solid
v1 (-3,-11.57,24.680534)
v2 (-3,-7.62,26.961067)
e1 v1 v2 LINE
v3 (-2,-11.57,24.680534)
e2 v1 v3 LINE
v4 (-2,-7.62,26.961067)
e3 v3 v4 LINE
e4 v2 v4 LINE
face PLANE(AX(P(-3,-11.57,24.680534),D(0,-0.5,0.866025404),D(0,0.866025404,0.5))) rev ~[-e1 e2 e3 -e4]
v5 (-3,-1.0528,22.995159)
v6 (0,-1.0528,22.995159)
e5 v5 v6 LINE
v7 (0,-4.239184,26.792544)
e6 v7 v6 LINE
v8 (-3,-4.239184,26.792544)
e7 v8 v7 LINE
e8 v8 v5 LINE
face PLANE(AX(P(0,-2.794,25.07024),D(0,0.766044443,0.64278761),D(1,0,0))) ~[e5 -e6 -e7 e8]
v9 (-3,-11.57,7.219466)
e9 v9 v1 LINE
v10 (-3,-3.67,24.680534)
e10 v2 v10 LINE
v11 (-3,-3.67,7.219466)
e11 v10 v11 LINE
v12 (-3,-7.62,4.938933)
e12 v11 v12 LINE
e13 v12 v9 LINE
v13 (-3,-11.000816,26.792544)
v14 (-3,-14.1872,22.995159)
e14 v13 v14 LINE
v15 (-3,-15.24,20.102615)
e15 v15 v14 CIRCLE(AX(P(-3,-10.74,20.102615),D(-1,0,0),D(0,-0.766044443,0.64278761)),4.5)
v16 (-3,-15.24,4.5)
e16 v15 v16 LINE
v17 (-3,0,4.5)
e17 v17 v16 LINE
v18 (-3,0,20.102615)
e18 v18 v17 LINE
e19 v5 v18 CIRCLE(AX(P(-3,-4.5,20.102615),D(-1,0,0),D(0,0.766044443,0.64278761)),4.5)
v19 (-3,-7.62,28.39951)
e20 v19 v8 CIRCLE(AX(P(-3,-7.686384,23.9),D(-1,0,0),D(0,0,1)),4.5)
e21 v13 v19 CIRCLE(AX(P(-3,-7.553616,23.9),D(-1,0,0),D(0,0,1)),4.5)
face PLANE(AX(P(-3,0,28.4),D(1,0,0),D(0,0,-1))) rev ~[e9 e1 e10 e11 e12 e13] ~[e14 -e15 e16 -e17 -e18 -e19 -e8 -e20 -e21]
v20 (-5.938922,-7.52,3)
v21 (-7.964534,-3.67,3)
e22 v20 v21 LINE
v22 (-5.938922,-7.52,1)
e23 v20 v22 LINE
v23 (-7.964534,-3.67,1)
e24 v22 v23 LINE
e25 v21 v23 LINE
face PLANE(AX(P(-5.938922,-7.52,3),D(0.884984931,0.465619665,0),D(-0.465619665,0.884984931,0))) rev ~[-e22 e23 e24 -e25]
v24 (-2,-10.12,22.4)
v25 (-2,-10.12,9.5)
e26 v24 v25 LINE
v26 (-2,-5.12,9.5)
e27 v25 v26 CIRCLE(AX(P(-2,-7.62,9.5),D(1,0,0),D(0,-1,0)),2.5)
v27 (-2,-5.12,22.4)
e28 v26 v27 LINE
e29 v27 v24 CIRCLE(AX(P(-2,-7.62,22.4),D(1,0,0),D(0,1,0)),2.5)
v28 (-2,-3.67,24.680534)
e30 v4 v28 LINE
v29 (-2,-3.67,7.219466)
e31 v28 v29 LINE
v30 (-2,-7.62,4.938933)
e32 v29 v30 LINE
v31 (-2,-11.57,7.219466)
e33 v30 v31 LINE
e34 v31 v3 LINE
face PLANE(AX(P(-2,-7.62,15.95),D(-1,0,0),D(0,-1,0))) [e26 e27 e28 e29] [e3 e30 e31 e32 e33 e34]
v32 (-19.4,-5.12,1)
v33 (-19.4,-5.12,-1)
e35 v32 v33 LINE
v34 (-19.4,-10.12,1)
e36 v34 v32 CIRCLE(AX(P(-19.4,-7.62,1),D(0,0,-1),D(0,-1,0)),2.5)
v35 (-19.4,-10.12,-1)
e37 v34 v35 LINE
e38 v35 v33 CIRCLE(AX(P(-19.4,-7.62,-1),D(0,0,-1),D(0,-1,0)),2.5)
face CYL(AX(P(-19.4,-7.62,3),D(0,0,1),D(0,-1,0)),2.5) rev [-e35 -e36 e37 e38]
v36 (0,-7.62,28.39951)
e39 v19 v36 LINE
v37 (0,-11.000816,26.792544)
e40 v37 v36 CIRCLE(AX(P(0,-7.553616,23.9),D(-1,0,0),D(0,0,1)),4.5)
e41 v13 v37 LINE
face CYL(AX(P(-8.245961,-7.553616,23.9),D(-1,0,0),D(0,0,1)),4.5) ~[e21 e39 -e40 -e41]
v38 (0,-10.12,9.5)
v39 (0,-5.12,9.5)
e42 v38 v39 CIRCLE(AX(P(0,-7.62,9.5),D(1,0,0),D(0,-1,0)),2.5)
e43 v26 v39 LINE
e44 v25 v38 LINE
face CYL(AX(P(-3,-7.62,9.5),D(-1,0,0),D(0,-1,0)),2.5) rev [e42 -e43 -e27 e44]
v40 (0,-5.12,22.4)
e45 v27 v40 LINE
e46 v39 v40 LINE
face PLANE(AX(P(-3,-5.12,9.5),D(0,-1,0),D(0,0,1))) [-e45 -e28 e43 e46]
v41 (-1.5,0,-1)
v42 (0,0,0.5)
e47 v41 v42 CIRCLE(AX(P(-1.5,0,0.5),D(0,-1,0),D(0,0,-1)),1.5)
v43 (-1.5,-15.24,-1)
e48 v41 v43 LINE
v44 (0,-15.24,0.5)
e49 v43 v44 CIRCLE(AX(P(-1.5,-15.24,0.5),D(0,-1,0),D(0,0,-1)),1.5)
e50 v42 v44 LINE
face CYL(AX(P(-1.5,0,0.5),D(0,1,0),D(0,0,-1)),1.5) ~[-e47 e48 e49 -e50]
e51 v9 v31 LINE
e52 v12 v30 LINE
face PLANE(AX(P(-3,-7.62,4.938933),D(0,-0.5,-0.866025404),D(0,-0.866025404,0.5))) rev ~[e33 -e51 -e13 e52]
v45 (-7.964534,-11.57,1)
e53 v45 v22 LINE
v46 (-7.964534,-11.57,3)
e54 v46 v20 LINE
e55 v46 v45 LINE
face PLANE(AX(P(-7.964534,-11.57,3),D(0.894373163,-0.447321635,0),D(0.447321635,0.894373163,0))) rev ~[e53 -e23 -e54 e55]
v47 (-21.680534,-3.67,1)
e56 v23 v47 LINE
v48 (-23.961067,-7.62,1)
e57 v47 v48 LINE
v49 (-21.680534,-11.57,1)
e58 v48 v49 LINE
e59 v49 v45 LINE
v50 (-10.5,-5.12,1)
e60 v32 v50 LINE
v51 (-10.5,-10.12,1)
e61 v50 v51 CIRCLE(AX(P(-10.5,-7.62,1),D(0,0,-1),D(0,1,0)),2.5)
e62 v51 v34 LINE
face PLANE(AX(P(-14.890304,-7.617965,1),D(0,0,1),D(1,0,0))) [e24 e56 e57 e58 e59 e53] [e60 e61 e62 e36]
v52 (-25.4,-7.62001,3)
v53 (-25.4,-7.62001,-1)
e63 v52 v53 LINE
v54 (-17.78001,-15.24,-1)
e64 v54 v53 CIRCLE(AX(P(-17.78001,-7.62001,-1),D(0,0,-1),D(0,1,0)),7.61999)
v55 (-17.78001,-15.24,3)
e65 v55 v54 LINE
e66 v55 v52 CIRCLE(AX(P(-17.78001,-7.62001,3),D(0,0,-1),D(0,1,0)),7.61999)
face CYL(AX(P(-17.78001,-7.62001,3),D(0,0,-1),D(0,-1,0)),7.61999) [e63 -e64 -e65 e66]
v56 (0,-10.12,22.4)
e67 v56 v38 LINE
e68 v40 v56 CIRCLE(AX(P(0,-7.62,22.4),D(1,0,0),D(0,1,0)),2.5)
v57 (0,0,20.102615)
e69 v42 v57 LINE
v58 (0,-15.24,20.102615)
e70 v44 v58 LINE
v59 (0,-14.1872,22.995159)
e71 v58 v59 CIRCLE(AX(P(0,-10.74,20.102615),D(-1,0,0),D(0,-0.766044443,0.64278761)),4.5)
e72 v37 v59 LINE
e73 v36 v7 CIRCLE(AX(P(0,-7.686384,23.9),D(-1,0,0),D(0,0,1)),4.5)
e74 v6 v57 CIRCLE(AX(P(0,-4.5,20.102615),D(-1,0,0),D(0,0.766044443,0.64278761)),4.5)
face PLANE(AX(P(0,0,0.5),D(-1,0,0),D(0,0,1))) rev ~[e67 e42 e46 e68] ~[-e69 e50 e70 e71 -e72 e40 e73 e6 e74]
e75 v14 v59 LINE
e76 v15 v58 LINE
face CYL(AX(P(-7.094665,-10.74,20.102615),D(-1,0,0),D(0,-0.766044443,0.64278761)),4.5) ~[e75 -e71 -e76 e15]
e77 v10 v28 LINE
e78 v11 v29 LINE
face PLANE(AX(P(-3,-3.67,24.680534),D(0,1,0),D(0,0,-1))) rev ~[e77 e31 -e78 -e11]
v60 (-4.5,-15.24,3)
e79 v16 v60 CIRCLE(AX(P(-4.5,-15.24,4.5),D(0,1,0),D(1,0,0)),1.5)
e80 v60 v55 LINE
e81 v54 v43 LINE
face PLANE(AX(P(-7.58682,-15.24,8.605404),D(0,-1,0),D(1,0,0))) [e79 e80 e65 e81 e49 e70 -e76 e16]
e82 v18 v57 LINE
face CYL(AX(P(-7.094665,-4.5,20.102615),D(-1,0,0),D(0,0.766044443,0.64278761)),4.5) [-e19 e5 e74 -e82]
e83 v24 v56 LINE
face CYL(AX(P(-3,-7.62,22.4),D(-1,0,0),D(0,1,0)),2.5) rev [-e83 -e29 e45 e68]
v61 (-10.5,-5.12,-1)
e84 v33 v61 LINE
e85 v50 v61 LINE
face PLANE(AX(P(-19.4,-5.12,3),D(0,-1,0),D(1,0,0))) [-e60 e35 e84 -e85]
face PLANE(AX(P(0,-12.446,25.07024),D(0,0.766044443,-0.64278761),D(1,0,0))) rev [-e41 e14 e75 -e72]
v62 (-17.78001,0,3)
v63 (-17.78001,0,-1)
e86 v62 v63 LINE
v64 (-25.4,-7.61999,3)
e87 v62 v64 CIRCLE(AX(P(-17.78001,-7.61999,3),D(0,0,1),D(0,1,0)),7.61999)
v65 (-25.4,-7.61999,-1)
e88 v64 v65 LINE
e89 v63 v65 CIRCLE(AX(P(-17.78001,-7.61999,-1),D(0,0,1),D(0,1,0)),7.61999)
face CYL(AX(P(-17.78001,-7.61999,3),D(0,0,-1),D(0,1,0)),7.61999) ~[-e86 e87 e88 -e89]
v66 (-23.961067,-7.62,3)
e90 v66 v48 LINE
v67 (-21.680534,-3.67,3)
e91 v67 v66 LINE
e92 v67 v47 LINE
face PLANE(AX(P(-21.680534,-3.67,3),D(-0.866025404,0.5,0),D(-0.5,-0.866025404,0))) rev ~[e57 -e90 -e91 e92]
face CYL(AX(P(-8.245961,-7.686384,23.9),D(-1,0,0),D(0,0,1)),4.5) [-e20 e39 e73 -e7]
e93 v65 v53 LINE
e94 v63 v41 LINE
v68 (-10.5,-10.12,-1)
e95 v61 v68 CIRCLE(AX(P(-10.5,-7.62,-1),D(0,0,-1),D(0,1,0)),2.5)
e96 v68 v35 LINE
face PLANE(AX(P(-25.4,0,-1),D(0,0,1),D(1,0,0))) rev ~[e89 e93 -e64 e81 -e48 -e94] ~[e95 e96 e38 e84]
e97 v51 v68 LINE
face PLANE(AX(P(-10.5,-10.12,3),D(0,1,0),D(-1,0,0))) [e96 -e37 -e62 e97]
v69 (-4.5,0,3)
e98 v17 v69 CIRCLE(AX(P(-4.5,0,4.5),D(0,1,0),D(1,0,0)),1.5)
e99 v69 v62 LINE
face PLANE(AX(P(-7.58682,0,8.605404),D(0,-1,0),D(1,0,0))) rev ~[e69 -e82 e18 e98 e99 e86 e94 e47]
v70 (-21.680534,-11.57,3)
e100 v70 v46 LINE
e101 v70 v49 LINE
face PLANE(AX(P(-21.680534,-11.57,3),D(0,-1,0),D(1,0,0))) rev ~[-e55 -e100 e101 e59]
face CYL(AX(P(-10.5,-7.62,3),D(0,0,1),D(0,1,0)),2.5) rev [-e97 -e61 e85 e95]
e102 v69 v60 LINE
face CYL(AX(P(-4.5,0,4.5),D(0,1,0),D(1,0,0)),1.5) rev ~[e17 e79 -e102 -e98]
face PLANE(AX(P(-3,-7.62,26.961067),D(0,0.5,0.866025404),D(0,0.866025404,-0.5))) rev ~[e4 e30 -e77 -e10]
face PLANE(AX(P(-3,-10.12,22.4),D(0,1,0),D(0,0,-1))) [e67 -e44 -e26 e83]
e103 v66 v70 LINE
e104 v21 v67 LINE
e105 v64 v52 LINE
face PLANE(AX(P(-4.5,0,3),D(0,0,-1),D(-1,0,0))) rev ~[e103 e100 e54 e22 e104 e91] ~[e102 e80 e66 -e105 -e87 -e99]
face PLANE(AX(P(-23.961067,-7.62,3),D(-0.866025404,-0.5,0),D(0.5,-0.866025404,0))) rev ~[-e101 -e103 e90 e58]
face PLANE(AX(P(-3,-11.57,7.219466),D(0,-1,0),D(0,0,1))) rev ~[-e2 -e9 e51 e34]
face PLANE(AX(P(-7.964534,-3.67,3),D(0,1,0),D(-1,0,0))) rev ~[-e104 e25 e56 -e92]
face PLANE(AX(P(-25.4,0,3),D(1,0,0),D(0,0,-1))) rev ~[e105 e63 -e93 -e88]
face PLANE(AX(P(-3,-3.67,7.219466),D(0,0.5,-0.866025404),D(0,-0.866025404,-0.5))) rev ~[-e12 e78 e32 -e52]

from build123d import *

# Parameters (mm, degrees)
F1_DEPTH    = 15.24
F3_DEPTH    = 1
F4_DEPTH    = 3
F6_DEPTH    = 2
F7_DEPTH    = 4
F8_SIZE2    = 6.6595190754
F8_SIZE     = 5.588
F9_T1_DEPTH = 11.189330271
F9_T3_DEPTH = 13.4919223085
F10_R       = 7.61999


# Not quite as in the source:
# - a fillet or chamfer that OpenCascade refuses, or shapes differently, is made with other operations: its cross-section is extruded or revolved along the edge and cut away or added
# - a fillet or chamfer is up to 0.001 mm smaller than in the source, because OpenCascade refuses the exact size


with BuildPart() as f1:
    # F0 (on Front) → F1 (new body)
    with BuildSketch(Plane.XZ):
        with BuildLine():
            ThreePointArc((-3, 4.5), (-3.4393398282, 3.4393398282), (-4.5, 3))
            Line((-4.5, 3), (-25.4, 3))
            Line((-25.4, 3), (-25.4, -1))
            Line((-25.4, -1), (-1.5, -1))
            ThreePointArc((-1.5, -1), (-0.4393398282, -0.5606601718), (0, 0.5))
            Line((0, 0.5), (0, 28.4))
            Line((0, 28.4), (-3, 28.4))
            Line((-3, 28.4), (-3, 4.5))
        make_face()
    extrude(amount=F1_DEPTH)

    # F2 (on face) → F3 (cut)
    with BuildSketch(Plane(origin=(-3, 0, 0), x_dir=(0, -1, 0), z_dir=(-1, 0, 0))):
        Polygon((11.57, 20.1194664367), (11.57, 22.4), (11.57, 24.6805335633), (7.62, 26.9610671266), (3.67, 24.6805335633), (3.67, 22.4), (3.67, 20.1194664367), (3.67, 11.7805335633), (3.67, 9.5), (3.67, 7.2194664367), (7.62, 4.9389328734), (11.57, 7.2194664367), (11.57, 9.5), (11.57, 11.7805335633), align=None)
        with BuildLine():
            Line((5.12, 9.5), (5.12, 22.4))
            ThreePointArc((5.12, 22.4), (7.62, 24.9), (10.12, 22.4))
            Line((10.12, 22.4), (10.12, 9.5))
            ThreePointArc((10.12, 9.5), (7.62, 7), (5.12, 9.5))
        make_face(mode=Mode.SUBTRACT)
    extrude(amount=-F3_DEPTH, mode=Mode.SUBTRACT)

    # F4 (cut, through all): a face of the model
    f4_faces = [f1.faces().sort_by_distance(p)[0] for p in [
        (-3, -7.62, 15.95),
    ]]
    extrude(f4_faces, amount=-F4_DEPTH, mode=Mode.SUBTRACT)

    # F5 (on face) → F6 (cut)
    with BuildSketch(Plane.XY.offset(3)):
        Polygon((-21.6805335633, -11.57), (-7.9645335633, -11.57), (-5.938922, -7.52), (-7.9645335633, -3.67), (-21.6805335633, -3.67), (-23.9610671266, -7.62), align=None)
        with BuildLine():
            Line((-10.5, -10.12), (-19.4, -10.12))
            ThreePointArc((-19.4, -10.12), (-21.9, -7.62), (-19.4, -5.12))
            Line((-19.4, -5.12), (-10.5, -5.12))
            ThreePointArc((-10.5, -5.12), (-8, -7.62), (-10.5, -10.12))
        make_face(mode=Mode.SUBTRACT)
    extrude(amount=-F6_DEPTH, mode=Mode.SUBTRACT)

    # F7 (cut, through all): a face of the model
    f7_faces = [f1.faces().sort_by_distance(p)[0] for p in [
        (-14.95, -7.62, 3),
    ]]
    extrude(f7_faces, amount=-F7_DEPTH, mode=Mode.SUBTRACT)

    # F8
    f8_edges = [f1.edges().sort_by_distance(p)[0] for p in [
        (-1.5, -15.24, 28.4),
        (-1.5, 0, 28.4),
    ]]
    f8_side = f1.faces().sort_by_distance((-1.5, -7.62, 28.4))[0]
    chamfer(f8_edges, length=F8_SIZE, length2=F8_SIZE2, reference=f8_side)

    # F9: fillet of radius 4.5 on 4 edges, made by hand

    # F9_s2 → F9_t1 (cut)
    with BuildSketch(Plane.YZ.offset(-7.0946651355)):
        with BuildLine():
            ThreePointArc((-14.187199994, 22.995159114), (-14.9686167935, 21.6417055154), (-15.24, 20.1026148704))
            Line((-15.24, 20.1026148704), (-15.24, 21.7404809246))
            Line((-15.24, 21.7404809246), (-14.187199994, 22.995159114))
        make_face()
        with BuildLine():
            ThreePointArc((-1.052800006, 22.995159114), (-0.2713832065, 21.6417055154), (0, 20.1026148704))
            Line((0, 20.1026148704), (0, 21.7404809246))
            Line((0, 21.7404809246), (-1.052800006, 22.995159114))
        make_face()
    extrude(amount=F9_T1_DEPTH, mode=Mode.SUBTRACT)

    # F9_s4 → F9_t3 (cut)
    with BuildSketch(Plane.YZ.offset(-8.2459611542)):
        with BuildLine():
            ThreePointArc((-7.5536155383, 28.4), (-9.4553977161, 27.9783850417), (-11.0008155323, 26.7925442436))
            Line((-11.0008155323, 26.7925442436), (-9.652, 28.4))
            Line((-9.652, 28.4), (-7.5536155383, 28.4))
        make_face()
        with BuildLine():
            ThreePointArc((-7.6863844617, 28.4), (-5.7846022839, 27.9783850417), (-4.2391844677, 26.7925442436))
            Line((-4.2391844677, 26.7925442436), (-5.588, 28.4))
            Line((-5.588, 28.4), (-7.6863844617, 28.4))
        make_face()
    extrude(amount=F9_T3_DEPTH, mode=Mode.SUBTRACT)

    # F10 (radius 7.62 in the source; OpenCascade refuses exactly that, so slightly less here)
    f10_edges = [f1.edges().sort_by_distance(p)[0] for p in [
        (-25.4, -15.24, 1),
        (-25.4, 0, 1),
    ]]
    fillet(f10_edges, radius=F10_R)


solid = f1.part
